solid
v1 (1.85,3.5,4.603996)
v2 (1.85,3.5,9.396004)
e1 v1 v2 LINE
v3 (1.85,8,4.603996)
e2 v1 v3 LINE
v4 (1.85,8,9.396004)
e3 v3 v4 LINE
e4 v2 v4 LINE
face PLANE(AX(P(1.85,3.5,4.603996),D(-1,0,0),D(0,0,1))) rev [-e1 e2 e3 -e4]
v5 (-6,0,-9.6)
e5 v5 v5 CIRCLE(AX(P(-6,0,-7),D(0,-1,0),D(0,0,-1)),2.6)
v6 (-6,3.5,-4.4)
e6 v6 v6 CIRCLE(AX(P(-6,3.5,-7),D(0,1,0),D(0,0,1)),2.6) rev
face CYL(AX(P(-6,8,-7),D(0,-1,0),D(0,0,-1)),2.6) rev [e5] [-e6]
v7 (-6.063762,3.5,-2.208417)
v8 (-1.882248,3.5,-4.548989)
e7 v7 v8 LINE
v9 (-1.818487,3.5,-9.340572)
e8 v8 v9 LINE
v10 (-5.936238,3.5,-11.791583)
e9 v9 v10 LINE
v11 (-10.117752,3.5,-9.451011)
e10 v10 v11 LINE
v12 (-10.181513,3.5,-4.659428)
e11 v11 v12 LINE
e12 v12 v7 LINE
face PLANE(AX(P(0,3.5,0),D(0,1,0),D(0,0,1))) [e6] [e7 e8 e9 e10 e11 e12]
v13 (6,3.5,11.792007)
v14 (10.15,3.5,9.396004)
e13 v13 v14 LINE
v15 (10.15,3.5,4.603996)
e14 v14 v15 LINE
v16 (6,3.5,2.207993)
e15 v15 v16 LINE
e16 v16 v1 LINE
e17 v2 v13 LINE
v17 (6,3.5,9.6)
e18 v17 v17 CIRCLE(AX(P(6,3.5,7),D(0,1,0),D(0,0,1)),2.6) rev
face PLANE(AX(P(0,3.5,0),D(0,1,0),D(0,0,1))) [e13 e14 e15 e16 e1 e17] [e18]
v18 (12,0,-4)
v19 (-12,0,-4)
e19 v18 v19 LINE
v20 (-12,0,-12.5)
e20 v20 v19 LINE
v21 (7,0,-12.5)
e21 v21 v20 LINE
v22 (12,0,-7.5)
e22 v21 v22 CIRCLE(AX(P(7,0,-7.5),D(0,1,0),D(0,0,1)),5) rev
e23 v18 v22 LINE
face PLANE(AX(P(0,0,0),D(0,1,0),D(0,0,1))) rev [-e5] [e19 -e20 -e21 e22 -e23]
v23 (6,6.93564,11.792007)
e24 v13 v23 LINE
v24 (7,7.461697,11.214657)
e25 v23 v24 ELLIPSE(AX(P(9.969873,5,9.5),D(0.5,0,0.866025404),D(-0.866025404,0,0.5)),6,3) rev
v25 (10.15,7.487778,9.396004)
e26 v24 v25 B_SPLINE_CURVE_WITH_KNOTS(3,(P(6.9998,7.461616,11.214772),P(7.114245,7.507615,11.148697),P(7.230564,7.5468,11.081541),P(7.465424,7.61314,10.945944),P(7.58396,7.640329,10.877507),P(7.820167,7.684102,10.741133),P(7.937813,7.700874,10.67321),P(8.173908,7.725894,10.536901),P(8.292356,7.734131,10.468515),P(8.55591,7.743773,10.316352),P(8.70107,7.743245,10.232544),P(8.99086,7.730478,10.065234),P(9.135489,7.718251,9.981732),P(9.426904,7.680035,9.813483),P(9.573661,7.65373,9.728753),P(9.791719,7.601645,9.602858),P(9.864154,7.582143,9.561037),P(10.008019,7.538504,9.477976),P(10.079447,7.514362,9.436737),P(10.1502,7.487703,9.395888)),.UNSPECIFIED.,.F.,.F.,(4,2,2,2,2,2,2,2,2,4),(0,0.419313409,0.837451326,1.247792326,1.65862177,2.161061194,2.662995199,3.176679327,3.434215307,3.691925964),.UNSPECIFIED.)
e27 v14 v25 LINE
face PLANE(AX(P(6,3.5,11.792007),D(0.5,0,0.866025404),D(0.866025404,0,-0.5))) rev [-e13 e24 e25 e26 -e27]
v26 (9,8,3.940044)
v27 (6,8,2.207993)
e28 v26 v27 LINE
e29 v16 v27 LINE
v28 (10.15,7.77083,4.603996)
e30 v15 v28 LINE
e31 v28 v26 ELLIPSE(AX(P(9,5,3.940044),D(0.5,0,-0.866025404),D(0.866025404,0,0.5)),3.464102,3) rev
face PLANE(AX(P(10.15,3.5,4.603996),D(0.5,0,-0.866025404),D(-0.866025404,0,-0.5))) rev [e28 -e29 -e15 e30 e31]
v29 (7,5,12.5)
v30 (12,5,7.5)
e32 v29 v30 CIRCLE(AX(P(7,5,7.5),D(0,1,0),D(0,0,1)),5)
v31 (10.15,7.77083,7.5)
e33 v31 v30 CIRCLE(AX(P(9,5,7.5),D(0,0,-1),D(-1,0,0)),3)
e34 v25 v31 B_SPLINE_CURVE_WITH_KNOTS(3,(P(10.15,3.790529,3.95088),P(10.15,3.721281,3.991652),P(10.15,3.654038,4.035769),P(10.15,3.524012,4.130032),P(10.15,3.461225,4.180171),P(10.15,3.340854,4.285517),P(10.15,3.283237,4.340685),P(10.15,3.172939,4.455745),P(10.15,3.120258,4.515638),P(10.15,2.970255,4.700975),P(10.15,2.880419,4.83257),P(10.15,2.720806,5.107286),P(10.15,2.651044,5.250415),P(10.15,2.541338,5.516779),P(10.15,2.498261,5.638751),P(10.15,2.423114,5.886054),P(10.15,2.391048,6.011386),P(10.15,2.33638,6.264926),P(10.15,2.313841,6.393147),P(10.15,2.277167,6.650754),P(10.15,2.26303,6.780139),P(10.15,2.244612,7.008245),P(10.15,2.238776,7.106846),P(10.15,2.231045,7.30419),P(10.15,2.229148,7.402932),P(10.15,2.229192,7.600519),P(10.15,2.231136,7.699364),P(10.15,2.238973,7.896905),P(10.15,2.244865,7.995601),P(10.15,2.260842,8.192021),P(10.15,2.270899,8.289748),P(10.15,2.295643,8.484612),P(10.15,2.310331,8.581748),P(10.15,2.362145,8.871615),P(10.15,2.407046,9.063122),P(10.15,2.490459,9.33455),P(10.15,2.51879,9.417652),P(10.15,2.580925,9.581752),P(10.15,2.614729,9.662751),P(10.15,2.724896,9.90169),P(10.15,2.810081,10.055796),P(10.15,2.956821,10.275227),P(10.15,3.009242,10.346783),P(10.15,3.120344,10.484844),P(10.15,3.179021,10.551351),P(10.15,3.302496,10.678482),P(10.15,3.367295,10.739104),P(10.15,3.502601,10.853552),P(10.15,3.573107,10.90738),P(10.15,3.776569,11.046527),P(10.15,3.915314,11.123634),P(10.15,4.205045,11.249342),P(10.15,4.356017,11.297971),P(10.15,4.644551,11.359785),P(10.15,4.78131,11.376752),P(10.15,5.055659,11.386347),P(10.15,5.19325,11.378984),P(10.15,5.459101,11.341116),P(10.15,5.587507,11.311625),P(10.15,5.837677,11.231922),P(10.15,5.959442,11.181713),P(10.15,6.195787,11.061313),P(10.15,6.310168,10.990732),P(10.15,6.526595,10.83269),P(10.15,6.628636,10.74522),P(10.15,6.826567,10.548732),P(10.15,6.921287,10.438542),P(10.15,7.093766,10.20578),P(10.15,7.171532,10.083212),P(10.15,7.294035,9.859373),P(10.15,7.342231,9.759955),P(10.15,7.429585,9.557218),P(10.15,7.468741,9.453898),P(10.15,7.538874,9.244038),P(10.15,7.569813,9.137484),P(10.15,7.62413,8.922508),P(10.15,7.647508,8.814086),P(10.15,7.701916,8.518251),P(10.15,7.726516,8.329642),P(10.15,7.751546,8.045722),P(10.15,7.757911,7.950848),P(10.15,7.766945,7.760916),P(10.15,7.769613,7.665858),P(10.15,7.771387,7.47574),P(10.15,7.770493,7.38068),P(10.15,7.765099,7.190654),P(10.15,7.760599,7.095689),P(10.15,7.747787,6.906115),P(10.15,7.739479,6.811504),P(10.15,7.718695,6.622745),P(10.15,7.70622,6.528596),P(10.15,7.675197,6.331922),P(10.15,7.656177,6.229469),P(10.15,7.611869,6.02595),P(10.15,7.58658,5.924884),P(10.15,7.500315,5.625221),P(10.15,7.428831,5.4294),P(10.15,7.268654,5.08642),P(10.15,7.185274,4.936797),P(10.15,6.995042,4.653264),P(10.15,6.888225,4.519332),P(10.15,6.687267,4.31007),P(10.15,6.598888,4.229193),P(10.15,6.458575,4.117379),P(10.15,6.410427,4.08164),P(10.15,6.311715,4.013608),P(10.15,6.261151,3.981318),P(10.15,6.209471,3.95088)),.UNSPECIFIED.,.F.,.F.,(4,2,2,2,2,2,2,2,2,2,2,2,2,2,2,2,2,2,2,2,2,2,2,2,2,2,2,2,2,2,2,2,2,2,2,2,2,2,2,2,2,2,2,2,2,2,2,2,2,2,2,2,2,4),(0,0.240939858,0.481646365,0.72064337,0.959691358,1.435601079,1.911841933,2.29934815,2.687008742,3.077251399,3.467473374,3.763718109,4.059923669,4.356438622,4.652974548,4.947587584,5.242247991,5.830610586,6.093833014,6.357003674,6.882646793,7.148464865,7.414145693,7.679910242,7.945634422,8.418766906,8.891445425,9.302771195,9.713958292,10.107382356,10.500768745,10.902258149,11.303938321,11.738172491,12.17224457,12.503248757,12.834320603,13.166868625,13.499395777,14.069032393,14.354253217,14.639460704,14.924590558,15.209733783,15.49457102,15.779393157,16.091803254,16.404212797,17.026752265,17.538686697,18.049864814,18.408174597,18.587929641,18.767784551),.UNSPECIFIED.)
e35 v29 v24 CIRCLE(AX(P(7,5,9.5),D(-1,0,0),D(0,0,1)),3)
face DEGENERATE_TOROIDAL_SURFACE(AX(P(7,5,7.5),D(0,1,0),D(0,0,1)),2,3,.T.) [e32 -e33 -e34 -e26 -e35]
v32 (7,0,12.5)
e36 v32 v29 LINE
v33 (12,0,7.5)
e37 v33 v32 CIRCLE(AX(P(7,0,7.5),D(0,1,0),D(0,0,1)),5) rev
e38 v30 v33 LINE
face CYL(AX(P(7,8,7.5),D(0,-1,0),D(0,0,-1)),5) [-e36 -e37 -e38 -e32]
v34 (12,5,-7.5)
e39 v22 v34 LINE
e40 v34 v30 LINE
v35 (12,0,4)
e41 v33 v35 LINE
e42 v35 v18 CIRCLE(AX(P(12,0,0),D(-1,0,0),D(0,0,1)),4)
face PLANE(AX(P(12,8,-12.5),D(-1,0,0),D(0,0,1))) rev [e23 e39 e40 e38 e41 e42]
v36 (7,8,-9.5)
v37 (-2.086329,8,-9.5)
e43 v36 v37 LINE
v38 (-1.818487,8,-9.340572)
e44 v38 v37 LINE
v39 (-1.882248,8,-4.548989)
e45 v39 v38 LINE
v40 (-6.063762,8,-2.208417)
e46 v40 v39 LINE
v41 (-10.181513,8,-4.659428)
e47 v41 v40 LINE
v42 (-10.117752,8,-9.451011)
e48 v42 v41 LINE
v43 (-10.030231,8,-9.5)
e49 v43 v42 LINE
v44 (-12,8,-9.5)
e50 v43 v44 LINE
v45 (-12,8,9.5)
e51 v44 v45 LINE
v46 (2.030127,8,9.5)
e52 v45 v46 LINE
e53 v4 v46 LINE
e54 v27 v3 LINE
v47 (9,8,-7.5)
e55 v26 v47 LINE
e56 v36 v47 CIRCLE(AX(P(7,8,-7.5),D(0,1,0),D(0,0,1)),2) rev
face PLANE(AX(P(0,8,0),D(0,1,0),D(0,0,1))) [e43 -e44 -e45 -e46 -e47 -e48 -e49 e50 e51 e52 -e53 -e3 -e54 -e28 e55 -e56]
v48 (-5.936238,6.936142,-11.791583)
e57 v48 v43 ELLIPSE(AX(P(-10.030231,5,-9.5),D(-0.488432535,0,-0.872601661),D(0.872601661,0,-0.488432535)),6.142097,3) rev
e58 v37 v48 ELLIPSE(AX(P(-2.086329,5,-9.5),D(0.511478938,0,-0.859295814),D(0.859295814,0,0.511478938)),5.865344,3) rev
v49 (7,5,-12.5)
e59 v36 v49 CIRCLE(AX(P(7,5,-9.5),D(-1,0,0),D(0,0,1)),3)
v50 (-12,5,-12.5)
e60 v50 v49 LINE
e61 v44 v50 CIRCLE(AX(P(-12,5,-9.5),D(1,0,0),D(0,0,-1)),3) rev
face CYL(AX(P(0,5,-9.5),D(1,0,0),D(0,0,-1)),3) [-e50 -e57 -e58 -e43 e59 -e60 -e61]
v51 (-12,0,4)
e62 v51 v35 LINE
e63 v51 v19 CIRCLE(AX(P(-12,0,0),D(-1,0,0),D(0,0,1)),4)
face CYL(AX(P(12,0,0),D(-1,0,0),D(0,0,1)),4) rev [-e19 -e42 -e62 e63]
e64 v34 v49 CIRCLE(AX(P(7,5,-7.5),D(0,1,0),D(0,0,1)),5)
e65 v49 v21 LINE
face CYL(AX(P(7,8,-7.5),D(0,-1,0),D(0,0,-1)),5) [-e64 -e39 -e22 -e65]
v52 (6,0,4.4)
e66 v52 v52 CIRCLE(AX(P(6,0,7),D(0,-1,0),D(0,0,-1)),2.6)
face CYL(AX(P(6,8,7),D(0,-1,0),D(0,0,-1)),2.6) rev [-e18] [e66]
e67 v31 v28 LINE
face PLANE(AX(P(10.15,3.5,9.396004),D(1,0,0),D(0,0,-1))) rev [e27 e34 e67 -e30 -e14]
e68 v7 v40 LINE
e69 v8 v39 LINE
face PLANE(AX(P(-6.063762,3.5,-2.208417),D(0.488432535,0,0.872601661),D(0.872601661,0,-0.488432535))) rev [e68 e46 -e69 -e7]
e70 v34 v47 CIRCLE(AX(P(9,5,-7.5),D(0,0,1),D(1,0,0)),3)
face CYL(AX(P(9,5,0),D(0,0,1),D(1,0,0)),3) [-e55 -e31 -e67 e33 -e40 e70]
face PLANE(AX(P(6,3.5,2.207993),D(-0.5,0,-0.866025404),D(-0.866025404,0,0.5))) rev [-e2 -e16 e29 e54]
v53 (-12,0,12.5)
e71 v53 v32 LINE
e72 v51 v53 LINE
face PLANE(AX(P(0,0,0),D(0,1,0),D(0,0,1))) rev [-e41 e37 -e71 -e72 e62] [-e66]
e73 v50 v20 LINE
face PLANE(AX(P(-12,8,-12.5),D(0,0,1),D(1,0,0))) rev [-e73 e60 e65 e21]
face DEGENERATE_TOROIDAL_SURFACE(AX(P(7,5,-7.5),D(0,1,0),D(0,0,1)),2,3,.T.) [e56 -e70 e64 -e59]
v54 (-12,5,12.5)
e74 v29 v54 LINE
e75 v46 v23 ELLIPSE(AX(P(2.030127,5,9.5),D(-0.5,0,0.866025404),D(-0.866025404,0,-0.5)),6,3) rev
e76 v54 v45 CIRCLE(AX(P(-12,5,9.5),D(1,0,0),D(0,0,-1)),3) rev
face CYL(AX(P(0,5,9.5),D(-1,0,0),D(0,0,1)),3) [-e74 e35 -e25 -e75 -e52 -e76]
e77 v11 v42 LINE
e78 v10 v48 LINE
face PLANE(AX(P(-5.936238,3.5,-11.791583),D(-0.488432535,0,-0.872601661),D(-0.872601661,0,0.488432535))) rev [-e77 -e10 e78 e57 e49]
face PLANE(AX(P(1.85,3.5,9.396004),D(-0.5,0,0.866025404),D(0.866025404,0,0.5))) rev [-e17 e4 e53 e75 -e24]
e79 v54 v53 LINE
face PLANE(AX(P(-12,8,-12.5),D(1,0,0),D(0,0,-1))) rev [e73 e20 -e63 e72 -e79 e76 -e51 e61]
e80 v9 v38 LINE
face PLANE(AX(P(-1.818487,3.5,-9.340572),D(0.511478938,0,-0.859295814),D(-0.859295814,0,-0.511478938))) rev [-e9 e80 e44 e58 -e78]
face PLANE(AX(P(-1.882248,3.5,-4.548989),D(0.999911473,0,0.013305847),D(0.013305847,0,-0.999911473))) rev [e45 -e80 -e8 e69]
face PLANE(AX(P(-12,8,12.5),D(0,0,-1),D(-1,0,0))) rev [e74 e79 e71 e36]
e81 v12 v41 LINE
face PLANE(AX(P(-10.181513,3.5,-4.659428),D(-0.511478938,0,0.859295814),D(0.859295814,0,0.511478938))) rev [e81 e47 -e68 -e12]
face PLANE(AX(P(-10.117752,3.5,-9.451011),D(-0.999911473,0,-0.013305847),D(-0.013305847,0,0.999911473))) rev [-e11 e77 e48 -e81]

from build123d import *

# Parameters (mm, degrees)
SKETCH1_W           = 24
SKETCH1_H           = 25
BOSS_EXTRUDE1_DEPTH = 8
SKETCH2_R           = 4
CUT_EXTRUDE1_DEPTH  = 29.217902119
SKETCH3_R           = 2.6
CUT_EXTRUDE2_DEPTH  = 20.085334684
FILLET1_R           = 3
FILLET2_R           = 5
CUT_EXTRUDE3_DEPTH  = 4.5


with BuildPart() as part:
    # Sketch1 → Boss-Extrude1 (new body)
    with BuildSketch(Plane(origin=(0, 0, 0), x_dir=(1, 0, 0), z_dir=(0, 1, 0))):
        Rectangle(SKETCH1_W, SKETCH1_H)
    extrude(amount=BOSS_EXTRUDE1_DEPTH)

    # Sketch2 → Cut-Extrude1 (cut, through all)
    with BuildSketch(Plane.ZY.offset(12)):
        Circle(SKETCH2_R)
    extrude(amount=-CUT_EXTRUDE1_DEPTH, mode=Mode.SUBTRACT)

    # Sketch3 → Cut-Extrude2 (cut, through all)
    with BuildSketch(Plane.XZ):
        with Locations(Location((-6, -7, 0), (0, 0, 270))):
            Circle(SKETCH3_R)
        with Locations(Location((6, 7, 0), (0, 0, 270))):
            Circle(SKETCH3_R)
    extrude(amount=-CUT_EXTRUDE2_DEPTH, mode=Mode.SUBTRACT)

    # Fillet1
    # the kernel refuses this fillet: 3 mm, written as the material it takes off along each edge
    with BuildSketch(Plane(origin=(19.5, 8, 12.5), x_dir=(0, 0, -1), z_dir=(-1, 0, 0))) as fillet1_piece_1:
        with BuildLine():
            CenterArc((FILLET1_R, FILLET1_R), FILLET1_R, 180, 90)
            Line((0, FILLET1_R), (0, 0))
            Line((0, 0), (FILLET1_R, 0))
        make_face()
    extrude(amount=39, mode=Mode.SUBTRACT)
    with BuildSketch(Plane(origin=(12, 8, -20), x_dir=(0, -1, 0), z_dir=(0, 0, 1))) as fillet1_piece_2:
        with BuildLine():
            CenterArc((FILLET1_R, -FILLET1_R), FILLET1_R, 90, 90)
            Line((0, -FILLET1_R), (0, 0))
            Line((0, 0), (FILLET1_R, 0))
        make_face()
    extrude(amount=40, mode=Mode.SUBTRACT)
    with BuildSketch(Plane(origin=(-19.5, 8, -12.5), x_dir=(0, -1, 0), z_dir=(1, 0, 0))) as fillet1_piece_3:
        with BuildLine():
            CenterArc((FILLET1_R, -FILLET1_R), FILLET1_R, 90, 90)
            Line((0, -FILLET1_R), (0, 0))
            Line((0, 0), (FILLET1_R, 0))
        make_face()
    extrude(amount=39, mode=Mode.SUBTRACT)

    # Fillet2
    # the kernel refuses this fillet: 5 mm, written as the material it takes off along each edge
    with BuildSketch(Plane(origin=(7, 8, 7.5), x_dir=(0, 0, 1), z_dir=(-1, 0, 0))) as fillet2_piece_1:
        with BuildLine():
            CenterArc((2, -3), 3, 0, 90)
            Line((5, -3), (5, 0))
            Line((5, 0), (2, 0))
        make_face()
    revolve(axis=Axis((7, 8, 7.5), (0, 1, 0)), revolution_arc=90, mode=Mode.SUBTRACT)
    with BuildSketch(Plane(origin=(7, 8, -7.5), x_dir=(1, 0, 0), z_dir=(0, 0, 1))) as fillet2_piece_2:
        with BuildLine():
            CenterArc((2, -3), 3, 0, 90)
            Line((5, -3), (5, 0))
            Line((5, 0), (2, 0))
        make_face()
    revolve(axis=Axis((7, 8, -7.5), (0, 1, 0)), revolution_arc=90, mode=Mode.SUBTRACT)
    with BuildSketch(Plane(origin=(12, -12.5, -12.5), x_dir=(-1, 0, 0), z_dir=(0, 1, 0)), Plane(origin=(12, -12.5, 12.5), x_dir=(0, 0, -1), z_dir=(0, 1, 0))) as fillet2_piece_3:
        with BuildLine():
            CenterArc((FILLET2_R, FILLET2_R), FILLET2_R, 180, 90)
            Line((0, FILLET2_R), (0, 0))
            Line((0, 0), (FILLET2_R, 0))
        make_face()
    extrude(amount=20.5, mode=Mode.SUBTRACT)

    # Sketch4 → Cut-Extrude3 (cut)
    with BuildSketch(Plane(origin=(0, 8, 0), x_dir=(1, 0, 0), z_dir=(0, 1, 0))):
        Polygon((6, -11.792007234), (10.15, -9.396003617), (10.15, -4.603996383), (6, -2.207992766), (1.85, -4.603996383), (1.85, -9.396003617), align=None)
        Polygon((-6.063761716, 2.208416986), (-1.882248244, 4.548989227), (-1.818486528, 9.340572241), (-5.936238284, 11.791583014), (-10.117751756, 9.451010773), (-10.181513472, 4.659427759), align=None)
    extrude(amount=-CUT_EXTRUDE3_DEPTH, mode=Mode.SUBTRACT)


solid = part.part
